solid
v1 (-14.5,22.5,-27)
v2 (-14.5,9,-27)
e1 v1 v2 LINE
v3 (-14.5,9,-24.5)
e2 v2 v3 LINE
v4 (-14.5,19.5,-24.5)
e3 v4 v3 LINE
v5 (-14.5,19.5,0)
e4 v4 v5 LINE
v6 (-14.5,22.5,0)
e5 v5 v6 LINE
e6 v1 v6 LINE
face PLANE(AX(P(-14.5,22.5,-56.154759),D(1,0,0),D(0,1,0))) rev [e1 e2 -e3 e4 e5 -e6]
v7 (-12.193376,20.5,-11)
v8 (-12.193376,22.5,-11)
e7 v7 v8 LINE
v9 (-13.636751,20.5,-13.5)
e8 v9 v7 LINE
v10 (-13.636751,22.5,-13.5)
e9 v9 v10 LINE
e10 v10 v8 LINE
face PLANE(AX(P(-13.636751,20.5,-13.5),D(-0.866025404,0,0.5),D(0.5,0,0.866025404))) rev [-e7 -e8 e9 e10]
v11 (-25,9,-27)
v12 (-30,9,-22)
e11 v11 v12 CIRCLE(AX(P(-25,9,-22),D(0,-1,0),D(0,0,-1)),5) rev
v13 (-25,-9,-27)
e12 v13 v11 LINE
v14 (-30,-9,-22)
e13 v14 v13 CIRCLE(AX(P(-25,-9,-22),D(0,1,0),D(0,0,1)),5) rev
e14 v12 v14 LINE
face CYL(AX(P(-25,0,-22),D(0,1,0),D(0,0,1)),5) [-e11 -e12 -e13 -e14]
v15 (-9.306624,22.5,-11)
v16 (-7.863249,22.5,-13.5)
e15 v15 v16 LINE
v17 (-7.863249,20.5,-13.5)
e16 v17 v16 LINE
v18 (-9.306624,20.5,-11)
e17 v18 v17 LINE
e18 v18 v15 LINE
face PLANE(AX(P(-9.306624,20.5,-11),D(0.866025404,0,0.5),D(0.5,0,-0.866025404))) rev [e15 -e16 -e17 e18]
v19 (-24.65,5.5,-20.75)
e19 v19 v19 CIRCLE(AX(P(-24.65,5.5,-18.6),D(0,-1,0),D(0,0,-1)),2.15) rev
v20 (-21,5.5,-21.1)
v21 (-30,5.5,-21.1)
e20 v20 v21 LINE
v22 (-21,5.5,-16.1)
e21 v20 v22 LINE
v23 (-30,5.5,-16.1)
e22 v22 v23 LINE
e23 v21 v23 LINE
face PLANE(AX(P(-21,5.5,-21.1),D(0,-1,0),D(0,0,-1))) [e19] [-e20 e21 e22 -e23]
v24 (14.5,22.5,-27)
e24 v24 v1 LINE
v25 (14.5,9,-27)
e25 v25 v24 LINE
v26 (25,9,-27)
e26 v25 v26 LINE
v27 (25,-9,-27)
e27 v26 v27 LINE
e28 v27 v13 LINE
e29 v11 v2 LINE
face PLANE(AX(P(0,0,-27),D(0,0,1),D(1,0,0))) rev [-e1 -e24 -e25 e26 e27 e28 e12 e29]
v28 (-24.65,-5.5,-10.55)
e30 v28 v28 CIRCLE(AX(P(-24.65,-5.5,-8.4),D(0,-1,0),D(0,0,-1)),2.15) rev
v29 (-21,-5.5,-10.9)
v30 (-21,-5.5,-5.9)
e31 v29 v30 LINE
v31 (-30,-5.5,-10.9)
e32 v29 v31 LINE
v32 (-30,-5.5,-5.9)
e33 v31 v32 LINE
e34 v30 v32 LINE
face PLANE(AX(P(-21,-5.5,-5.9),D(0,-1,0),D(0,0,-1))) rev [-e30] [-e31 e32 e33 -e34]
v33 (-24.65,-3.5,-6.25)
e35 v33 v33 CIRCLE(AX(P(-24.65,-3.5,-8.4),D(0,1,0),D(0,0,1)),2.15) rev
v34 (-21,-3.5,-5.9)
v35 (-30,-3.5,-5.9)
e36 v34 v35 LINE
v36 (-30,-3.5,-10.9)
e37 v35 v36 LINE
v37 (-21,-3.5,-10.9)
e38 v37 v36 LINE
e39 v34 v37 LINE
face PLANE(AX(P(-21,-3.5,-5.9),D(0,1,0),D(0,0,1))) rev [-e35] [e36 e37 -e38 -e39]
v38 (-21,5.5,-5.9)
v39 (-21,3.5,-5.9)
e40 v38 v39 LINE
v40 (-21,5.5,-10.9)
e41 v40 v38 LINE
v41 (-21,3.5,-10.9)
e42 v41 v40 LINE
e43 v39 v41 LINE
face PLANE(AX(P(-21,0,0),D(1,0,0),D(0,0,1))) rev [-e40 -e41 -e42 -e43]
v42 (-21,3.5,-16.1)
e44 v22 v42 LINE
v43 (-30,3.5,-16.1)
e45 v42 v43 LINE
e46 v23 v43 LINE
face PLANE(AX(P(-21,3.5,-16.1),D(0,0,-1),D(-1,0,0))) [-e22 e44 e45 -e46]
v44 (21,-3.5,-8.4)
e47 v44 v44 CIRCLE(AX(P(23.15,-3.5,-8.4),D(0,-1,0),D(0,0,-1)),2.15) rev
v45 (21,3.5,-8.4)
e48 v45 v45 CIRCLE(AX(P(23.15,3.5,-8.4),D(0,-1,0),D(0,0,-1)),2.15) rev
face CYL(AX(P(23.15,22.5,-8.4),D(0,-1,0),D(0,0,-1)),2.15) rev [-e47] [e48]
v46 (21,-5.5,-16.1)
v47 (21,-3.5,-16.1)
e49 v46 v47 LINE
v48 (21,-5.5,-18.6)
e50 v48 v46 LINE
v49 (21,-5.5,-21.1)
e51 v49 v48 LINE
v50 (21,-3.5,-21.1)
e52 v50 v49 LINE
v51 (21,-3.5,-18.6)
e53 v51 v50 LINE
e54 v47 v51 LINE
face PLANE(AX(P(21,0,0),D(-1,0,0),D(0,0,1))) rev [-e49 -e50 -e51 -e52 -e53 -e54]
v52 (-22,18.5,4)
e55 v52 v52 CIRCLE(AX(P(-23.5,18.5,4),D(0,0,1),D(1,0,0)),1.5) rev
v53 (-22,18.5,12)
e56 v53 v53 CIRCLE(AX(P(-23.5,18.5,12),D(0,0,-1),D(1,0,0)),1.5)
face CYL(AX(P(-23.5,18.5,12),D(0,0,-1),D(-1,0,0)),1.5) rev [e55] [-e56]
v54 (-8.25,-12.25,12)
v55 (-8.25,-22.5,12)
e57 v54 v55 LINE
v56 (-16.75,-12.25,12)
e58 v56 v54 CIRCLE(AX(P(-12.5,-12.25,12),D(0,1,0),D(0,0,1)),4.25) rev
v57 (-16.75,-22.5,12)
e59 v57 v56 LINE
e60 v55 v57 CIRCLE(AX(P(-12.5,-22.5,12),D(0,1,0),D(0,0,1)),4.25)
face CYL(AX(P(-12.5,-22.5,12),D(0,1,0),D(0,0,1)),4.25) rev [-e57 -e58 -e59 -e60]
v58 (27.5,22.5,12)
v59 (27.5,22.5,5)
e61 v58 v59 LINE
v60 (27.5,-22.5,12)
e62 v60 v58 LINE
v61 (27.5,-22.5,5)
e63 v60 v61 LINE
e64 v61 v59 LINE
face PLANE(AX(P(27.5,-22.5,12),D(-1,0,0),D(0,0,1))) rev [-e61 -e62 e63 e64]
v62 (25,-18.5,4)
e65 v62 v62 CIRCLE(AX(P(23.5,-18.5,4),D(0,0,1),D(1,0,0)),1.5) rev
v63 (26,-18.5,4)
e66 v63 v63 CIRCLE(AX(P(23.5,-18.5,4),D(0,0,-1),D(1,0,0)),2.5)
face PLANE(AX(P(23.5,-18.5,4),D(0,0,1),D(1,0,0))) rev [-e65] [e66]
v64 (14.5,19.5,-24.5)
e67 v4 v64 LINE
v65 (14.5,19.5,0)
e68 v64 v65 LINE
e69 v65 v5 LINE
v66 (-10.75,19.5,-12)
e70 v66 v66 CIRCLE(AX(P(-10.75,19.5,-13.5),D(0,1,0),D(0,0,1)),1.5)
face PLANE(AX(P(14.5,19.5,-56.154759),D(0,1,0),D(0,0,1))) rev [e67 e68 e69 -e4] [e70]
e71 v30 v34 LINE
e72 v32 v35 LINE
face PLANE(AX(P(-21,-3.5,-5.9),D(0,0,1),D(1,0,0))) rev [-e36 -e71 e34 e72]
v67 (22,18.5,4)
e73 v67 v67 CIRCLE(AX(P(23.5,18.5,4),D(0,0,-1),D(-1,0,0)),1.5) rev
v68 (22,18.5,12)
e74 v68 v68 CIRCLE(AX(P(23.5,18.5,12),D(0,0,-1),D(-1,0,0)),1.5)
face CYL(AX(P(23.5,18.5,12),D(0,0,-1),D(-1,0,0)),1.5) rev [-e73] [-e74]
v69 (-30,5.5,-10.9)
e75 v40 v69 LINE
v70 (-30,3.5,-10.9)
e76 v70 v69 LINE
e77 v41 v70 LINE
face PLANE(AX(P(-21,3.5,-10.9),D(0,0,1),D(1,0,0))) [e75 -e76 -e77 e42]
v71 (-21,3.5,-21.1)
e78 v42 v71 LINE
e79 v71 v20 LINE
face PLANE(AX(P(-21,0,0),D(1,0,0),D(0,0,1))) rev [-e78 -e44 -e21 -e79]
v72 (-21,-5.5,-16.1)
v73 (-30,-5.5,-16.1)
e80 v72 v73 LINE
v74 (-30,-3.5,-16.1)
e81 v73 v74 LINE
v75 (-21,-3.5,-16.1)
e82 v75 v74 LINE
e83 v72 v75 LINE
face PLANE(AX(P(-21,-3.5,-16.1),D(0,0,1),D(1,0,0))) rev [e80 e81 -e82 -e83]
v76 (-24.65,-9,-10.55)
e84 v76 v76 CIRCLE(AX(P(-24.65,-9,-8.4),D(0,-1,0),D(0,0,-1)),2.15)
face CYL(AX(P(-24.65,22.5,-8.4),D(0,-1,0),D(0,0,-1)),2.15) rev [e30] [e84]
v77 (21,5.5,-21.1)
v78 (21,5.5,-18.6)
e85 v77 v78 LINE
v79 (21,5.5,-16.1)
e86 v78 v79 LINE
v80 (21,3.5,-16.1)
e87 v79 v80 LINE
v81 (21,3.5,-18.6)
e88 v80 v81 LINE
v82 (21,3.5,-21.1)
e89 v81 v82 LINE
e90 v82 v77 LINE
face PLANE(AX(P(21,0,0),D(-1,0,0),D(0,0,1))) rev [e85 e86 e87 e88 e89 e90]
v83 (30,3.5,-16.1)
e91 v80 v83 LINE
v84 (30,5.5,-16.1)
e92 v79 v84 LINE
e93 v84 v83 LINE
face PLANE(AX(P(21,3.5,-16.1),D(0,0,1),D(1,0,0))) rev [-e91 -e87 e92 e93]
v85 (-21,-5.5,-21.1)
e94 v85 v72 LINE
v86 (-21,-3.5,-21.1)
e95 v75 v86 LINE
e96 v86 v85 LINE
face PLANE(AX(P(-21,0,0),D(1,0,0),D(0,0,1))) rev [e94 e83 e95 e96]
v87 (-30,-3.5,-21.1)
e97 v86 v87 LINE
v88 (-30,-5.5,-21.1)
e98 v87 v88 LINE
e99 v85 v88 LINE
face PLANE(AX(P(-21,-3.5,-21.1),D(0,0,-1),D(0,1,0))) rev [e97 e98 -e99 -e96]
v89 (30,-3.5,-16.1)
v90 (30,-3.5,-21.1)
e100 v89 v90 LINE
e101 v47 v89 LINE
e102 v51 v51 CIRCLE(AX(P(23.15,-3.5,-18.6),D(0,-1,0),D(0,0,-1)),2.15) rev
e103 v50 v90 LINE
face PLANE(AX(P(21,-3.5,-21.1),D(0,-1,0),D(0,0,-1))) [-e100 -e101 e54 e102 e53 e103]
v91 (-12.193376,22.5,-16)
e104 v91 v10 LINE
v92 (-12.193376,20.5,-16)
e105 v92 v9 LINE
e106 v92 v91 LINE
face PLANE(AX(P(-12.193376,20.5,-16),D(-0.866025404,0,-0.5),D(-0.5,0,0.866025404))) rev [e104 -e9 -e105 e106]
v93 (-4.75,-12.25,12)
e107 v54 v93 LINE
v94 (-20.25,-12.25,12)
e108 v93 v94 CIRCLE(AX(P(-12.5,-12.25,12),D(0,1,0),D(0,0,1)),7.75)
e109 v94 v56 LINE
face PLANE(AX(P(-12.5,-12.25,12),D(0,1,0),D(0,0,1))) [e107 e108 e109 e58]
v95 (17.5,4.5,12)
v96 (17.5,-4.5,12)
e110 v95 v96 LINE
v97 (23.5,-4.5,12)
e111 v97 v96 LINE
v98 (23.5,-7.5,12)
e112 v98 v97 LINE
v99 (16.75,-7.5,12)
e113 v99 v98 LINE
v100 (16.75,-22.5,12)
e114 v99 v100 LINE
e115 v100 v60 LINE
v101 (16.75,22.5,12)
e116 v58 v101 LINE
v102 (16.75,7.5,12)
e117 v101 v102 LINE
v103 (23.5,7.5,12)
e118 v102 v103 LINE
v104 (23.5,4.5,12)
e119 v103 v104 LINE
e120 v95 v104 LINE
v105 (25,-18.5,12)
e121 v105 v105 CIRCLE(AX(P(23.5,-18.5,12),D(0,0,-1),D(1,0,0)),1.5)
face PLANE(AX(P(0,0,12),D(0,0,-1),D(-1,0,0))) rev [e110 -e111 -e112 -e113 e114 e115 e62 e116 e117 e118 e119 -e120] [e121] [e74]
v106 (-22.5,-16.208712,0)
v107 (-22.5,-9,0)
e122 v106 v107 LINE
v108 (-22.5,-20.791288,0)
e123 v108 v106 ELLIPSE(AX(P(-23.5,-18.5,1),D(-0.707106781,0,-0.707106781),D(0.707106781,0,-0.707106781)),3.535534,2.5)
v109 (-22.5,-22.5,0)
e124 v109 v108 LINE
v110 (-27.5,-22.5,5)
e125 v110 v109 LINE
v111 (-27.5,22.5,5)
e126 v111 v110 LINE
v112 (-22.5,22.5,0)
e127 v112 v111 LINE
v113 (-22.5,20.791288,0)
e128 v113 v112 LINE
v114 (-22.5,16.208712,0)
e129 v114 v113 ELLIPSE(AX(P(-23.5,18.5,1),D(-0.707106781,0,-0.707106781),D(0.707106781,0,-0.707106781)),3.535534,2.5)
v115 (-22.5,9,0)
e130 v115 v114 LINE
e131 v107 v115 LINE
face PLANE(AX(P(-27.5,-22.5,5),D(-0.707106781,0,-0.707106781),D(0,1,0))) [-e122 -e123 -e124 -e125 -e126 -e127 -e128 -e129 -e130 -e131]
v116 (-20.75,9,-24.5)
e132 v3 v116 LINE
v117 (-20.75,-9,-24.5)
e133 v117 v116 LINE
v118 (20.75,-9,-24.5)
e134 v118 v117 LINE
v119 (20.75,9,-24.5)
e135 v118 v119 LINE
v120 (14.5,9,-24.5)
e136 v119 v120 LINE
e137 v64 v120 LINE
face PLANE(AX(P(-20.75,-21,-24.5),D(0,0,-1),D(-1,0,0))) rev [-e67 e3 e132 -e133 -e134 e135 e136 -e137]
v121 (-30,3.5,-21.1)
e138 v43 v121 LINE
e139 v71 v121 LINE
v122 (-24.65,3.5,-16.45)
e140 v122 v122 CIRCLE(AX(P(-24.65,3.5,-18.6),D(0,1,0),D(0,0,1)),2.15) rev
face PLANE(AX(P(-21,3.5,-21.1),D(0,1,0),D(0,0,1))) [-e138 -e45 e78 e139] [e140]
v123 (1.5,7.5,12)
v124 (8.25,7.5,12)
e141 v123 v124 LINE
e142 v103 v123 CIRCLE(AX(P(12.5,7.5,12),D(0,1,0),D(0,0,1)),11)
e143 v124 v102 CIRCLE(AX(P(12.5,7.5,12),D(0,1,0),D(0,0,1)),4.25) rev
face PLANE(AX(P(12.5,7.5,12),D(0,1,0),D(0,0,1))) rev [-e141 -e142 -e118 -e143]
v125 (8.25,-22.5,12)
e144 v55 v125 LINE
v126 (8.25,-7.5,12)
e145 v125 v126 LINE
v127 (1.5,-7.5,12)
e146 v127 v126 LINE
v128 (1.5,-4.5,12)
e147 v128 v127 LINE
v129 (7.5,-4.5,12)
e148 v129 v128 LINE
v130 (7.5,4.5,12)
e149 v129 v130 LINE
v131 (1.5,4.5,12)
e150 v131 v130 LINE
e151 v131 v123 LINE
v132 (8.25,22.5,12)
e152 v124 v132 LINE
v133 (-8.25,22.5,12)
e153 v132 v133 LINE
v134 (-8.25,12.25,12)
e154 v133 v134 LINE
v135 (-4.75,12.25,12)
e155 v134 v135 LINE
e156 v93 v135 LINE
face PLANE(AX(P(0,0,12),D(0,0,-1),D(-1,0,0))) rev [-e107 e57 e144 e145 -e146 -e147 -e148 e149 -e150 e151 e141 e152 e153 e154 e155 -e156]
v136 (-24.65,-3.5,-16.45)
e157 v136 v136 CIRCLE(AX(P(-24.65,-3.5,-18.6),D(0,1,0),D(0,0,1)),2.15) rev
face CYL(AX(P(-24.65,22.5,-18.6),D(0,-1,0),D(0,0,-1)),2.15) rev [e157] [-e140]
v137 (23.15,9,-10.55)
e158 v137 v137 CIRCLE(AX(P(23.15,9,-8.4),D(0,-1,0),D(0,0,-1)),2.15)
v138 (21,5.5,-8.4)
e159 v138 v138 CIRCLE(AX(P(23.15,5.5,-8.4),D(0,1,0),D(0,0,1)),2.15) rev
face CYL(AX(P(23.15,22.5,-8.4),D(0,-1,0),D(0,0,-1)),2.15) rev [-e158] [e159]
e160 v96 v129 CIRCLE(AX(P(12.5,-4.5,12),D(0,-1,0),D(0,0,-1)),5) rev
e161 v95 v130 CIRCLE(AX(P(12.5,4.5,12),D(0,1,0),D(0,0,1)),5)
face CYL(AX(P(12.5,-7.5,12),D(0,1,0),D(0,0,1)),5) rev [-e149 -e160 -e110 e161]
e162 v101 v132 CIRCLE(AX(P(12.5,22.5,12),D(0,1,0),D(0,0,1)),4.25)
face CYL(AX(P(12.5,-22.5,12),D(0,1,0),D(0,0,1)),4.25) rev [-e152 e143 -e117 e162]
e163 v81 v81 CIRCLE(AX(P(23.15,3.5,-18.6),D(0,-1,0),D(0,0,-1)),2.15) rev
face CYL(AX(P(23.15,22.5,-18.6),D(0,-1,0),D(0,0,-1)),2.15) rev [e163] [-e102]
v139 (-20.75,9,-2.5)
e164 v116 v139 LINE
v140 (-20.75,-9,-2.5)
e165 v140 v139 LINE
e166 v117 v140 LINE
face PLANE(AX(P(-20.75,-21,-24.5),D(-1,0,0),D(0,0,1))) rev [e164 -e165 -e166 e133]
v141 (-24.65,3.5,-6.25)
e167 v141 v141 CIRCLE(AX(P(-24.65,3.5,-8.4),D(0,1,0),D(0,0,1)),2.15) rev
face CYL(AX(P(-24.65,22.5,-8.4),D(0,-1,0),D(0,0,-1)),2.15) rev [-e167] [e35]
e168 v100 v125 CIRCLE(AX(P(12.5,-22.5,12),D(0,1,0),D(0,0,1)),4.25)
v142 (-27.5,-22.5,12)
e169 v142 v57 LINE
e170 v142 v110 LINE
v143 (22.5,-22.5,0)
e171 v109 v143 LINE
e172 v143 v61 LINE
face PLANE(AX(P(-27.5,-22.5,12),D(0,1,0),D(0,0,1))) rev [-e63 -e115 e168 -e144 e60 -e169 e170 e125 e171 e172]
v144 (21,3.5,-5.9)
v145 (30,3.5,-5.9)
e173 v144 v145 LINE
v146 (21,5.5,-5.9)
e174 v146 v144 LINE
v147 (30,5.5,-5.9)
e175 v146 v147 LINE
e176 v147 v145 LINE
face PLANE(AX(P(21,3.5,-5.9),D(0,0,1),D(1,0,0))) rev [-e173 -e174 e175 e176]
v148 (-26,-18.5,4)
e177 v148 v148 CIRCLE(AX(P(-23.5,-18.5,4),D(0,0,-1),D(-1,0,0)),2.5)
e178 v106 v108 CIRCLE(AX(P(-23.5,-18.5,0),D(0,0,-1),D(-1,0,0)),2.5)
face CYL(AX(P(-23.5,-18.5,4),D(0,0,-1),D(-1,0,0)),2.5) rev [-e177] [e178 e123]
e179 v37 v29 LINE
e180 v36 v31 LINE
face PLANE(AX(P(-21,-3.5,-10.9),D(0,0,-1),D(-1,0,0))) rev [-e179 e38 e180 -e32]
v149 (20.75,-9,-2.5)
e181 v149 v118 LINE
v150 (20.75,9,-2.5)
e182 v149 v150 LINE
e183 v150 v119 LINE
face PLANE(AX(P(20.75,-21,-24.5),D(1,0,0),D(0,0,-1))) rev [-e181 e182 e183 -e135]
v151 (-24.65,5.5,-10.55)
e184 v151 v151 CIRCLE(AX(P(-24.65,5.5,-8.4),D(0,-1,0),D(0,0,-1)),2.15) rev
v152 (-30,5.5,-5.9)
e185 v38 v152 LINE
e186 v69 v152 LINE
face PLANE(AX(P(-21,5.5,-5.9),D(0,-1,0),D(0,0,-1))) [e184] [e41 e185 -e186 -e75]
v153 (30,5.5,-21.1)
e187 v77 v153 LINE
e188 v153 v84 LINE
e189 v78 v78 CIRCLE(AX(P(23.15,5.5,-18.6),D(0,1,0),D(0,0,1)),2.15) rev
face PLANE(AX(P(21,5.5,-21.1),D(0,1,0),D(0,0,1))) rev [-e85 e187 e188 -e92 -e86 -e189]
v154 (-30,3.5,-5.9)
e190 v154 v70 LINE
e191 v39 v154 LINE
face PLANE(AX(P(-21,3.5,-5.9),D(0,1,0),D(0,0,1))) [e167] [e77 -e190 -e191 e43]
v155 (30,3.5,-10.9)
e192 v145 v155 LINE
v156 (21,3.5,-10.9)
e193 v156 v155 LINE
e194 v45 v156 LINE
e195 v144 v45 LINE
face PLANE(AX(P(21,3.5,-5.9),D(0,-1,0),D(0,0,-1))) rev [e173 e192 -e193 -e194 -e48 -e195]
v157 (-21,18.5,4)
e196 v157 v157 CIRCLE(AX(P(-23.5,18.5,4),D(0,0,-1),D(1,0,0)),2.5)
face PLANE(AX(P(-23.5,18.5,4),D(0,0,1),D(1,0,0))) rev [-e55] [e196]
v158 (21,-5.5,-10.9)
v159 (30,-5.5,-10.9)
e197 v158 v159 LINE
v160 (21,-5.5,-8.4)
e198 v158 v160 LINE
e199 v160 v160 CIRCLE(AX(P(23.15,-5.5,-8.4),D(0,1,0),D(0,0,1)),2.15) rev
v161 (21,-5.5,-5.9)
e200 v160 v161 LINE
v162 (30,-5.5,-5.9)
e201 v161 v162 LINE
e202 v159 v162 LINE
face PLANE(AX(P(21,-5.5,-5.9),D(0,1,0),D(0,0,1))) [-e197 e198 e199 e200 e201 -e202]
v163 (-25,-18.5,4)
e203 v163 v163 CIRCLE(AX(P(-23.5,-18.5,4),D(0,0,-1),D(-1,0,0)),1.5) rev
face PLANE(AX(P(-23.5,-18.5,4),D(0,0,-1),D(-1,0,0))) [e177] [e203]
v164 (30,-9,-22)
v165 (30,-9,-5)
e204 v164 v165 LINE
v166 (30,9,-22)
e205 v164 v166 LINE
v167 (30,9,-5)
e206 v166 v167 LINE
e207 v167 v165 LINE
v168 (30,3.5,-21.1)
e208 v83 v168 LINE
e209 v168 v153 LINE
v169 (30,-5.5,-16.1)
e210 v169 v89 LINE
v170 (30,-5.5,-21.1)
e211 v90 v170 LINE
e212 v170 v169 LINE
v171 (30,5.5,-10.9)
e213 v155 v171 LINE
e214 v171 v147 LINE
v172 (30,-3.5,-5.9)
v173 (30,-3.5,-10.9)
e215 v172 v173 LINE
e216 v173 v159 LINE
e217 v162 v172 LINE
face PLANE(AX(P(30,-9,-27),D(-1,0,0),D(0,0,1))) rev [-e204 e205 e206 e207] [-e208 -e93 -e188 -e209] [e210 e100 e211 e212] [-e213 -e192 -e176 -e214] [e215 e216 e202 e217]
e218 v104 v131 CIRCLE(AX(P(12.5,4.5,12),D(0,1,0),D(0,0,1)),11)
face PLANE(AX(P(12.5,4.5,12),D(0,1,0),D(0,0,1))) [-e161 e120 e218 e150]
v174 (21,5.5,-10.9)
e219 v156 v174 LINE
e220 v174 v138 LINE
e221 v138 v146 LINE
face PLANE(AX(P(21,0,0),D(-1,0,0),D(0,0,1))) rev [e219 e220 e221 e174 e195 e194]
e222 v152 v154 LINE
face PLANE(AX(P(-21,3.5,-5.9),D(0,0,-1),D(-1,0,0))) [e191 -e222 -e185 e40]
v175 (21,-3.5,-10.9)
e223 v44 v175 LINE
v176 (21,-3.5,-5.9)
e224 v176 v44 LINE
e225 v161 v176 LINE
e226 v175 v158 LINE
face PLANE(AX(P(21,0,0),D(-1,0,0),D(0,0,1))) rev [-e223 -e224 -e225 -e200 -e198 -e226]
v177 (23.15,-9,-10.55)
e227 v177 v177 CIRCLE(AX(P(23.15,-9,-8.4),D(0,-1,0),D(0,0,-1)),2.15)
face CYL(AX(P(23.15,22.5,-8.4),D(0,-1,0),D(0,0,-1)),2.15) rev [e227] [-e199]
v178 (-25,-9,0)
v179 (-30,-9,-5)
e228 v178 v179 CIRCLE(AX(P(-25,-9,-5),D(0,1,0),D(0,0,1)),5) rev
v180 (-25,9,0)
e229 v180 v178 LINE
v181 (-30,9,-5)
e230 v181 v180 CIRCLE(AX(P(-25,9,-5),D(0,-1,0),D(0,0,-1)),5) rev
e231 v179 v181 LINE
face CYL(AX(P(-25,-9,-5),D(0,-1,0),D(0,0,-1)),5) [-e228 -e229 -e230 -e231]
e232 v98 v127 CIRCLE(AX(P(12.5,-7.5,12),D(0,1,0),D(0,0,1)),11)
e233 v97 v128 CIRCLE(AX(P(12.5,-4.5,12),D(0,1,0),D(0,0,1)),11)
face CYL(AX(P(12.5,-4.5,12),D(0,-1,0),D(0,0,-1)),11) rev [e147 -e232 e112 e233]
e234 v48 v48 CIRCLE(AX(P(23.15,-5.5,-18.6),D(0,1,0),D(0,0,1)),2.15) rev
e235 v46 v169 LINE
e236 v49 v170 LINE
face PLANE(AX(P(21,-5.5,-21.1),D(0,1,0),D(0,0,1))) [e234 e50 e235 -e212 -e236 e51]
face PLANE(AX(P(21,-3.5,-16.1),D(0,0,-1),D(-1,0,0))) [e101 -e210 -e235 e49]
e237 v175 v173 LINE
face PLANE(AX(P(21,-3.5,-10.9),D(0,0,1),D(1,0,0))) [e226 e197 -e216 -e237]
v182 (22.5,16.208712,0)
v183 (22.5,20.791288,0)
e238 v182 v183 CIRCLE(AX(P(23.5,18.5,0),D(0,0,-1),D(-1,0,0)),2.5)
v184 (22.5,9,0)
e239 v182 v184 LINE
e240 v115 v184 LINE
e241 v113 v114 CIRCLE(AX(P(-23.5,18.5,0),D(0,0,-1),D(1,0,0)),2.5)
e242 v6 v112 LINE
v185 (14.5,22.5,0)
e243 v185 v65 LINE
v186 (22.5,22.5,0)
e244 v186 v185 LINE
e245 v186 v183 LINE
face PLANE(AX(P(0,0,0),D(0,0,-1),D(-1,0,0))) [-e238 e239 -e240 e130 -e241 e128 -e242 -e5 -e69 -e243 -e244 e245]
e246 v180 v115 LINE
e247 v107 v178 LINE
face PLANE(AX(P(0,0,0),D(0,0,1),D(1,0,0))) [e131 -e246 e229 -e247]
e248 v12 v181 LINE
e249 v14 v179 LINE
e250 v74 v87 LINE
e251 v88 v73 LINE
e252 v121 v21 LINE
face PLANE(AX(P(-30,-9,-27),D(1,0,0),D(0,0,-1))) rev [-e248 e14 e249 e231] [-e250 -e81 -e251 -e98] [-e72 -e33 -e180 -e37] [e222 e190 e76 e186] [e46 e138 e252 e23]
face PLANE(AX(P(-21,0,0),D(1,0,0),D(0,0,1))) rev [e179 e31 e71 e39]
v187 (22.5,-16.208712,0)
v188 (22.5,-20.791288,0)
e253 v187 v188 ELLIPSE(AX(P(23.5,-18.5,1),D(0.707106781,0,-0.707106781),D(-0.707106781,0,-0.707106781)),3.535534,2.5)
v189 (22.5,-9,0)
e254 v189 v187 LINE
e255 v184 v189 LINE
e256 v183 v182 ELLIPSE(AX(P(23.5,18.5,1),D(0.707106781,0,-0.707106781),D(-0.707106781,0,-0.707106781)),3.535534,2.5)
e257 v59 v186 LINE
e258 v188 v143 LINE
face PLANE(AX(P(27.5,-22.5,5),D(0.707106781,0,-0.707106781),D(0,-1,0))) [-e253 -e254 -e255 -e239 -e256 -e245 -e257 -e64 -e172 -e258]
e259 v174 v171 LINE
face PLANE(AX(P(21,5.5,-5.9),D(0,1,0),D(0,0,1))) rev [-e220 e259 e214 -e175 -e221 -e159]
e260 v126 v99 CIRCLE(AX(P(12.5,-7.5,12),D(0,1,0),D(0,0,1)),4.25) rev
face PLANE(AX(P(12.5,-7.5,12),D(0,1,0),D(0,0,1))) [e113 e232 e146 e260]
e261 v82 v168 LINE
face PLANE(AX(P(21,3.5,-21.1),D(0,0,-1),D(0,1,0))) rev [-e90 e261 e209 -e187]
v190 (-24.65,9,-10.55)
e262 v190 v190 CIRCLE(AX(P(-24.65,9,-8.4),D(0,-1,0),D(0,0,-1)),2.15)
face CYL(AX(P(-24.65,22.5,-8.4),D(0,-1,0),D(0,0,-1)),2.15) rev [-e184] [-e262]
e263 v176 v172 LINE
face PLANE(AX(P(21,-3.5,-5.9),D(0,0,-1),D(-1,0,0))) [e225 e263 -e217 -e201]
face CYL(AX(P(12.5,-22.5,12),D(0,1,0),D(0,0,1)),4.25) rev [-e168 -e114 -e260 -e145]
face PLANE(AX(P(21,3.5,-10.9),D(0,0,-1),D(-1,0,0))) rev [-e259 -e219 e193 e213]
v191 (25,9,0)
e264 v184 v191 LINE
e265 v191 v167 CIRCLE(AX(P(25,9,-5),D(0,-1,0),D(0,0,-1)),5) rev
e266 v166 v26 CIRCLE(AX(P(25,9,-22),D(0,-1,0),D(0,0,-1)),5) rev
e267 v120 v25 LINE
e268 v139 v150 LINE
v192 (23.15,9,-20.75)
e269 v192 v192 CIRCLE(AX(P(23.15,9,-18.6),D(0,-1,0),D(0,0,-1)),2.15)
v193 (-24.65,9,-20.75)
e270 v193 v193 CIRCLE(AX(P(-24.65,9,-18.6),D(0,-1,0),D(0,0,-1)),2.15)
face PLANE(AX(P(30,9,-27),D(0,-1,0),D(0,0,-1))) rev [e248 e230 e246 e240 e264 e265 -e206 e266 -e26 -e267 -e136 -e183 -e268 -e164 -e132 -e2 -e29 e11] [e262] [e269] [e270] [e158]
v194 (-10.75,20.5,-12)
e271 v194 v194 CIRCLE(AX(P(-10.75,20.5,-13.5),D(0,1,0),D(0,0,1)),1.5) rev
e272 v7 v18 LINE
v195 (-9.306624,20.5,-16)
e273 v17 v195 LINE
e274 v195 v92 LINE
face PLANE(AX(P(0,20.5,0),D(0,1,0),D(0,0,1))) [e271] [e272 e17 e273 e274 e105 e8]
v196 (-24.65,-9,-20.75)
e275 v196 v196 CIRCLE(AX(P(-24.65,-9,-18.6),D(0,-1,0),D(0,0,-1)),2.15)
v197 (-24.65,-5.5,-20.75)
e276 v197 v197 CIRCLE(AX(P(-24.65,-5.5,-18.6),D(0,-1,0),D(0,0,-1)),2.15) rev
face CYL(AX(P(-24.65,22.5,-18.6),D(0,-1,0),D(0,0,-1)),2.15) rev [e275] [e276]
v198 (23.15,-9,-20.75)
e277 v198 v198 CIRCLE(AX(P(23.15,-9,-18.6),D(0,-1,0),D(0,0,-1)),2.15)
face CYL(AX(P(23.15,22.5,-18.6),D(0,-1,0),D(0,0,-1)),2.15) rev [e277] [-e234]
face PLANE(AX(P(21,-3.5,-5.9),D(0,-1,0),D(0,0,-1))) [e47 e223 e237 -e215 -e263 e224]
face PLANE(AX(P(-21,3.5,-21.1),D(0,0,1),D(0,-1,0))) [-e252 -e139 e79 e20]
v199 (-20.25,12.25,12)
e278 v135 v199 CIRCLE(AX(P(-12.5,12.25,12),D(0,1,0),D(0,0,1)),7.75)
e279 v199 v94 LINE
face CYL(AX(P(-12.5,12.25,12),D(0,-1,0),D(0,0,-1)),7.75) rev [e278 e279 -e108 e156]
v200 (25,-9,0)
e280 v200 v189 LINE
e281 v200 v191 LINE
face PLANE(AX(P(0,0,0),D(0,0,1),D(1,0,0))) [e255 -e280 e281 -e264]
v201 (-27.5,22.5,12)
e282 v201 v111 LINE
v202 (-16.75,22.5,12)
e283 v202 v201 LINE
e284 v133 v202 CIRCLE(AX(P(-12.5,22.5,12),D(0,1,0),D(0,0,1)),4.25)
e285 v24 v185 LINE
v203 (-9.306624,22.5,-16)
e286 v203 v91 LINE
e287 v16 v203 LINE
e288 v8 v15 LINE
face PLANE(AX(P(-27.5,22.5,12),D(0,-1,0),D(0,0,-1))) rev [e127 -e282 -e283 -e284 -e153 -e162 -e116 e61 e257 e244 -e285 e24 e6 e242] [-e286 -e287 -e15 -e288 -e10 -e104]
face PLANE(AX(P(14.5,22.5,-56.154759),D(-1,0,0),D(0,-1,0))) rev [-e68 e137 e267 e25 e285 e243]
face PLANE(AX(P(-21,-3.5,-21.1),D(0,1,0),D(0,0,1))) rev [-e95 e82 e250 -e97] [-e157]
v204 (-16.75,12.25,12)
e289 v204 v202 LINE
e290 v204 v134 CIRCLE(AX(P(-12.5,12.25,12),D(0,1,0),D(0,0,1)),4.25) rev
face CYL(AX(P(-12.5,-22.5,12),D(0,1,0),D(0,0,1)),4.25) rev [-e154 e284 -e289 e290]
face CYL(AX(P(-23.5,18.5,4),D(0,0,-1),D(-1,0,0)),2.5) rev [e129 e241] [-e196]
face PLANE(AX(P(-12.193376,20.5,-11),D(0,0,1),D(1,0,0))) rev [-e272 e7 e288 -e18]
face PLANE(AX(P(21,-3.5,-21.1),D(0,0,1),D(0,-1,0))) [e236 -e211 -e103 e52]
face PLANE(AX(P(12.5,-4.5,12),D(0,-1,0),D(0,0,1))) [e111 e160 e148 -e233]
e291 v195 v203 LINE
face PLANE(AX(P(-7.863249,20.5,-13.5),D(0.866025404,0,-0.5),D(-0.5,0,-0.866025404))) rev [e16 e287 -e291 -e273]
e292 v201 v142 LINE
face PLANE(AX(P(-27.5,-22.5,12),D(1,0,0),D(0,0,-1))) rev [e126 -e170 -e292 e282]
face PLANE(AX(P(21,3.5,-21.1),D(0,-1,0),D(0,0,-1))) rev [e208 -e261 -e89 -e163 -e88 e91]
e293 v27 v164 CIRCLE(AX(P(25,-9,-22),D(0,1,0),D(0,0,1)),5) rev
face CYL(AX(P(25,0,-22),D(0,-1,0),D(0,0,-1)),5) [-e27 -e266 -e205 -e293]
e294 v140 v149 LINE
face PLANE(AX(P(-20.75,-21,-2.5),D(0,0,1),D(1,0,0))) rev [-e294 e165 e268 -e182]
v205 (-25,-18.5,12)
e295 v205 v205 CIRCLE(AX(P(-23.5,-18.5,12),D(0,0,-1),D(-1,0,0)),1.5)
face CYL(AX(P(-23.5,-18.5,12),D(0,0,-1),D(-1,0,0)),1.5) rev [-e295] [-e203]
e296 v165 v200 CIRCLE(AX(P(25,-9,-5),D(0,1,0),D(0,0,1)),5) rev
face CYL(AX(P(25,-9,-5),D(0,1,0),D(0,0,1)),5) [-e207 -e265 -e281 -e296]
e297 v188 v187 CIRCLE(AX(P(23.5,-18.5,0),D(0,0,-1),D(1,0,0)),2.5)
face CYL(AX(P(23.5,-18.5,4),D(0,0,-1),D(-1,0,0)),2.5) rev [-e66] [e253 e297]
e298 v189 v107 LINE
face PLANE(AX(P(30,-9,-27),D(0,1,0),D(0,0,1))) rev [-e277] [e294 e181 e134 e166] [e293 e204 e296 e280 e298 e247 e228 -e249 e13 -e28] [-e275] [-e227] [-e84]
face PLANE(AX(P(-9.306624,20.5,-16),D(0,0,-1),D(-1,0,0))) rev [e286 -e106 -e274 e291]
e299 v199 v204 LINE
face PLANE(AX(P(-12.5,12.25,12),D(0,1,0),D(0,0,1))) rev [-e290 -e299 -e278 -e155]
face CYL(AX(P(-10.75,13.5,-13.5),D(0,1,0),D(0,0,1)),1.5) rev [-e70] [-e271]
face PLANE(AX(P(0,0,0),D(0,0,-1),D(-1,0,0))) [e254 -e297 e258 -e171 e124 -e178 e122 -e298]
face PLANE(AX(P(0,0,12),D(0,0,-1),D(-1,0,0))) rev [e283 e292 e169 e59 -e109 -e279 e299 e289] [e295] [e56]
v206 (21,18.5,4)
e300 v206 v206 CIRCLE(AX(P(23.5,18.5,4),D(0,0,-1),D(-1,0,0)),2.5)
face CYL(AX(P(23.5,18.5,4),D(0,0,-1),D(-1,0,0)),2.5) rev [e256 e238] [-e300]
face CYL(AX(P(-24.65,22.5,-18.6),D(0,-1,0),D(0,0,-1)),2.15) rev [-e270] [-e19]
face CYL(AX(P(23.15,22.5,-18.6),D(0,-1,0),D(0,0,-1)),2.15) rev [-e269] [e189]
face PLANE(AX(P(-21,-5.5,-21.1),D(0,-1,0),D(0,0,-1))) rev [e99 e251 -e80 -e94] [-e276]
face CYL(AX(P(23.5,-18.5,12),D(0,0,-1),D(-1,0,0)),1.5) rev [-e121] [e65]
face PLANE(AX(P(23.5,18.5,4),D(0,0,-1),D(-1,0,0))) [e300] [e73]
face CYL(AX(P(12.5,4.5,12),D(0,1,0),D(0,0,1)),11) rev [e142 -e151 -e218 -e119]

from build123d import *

# Parameters (mm, degrees)
ESQUISSE1_W                  = 55
ESQUISSE1_H                  = 45
BOSS_EXTRU_1_DEPTH           = 12
ESQUISSE2_R                  = 4.25
ENL_V_MAT_EXTRU_1_DEPTH      = 55.085580333
ENL_V_MAT_EXTRU_2_DEPTH      = 12.25
ENL_V_MAT_EXTRU_2_DEPTH_BACK = 12.25
ESQUISSE3_R                  = 7.75
ESQUISSE4_R                  = 11
ENL_V_MAT_EXTRU_3_DEPTH      = 3
ESQUISSE5_R                  = 5
ENL_V_MAT_EXTRU_4_DEPTH      = 15
ENL_V_MAT_EXTRU_5_DEPTH      = 38.503333185
ENL_V_MAT_EXTRU_5_DEPTH_BACK = 38.503333185
ESQUISSE6_R                  = 1.5
ESQUISSE7_R                  = 2.5
ENL_V_MAT_EXTRU_6_DEPTH      = 4
CHANFREIN3_SIZE              = 5
ESQUISSE9_W                  = 60
ESQUISSE9_H                  = 18
BOSS_EXTRU_2_DEPTH           = 27
ESQUISSE10_W                 = 41.5
ESQUISSE10_H                 = 22
ENL_V_MAT_EXTRU_7_DEPTH      = 30
ESQUISSE11_R                 = 2.15
ENL_V_MAT_EXTRU_8_DEPTH      = 52.198144498
CONG_2_R                     = 5
CONG_3_R                     = 5
ESQUISSE12_W                 = 5
ESQUISSE12_H                 = 2
ENL_V_MAT_EXTRU_9_DEPTH      = 9
SYM_TRIE4_COPY_1_SKETCH_W    = 5
SYM_TRIE4_COPY_1_SKETCH_H    = 2
SYM_TRIE4_COPY_1_DEPTH       = 9
ESQUISSE13_W                 = 29
ESQUISSE13_H                 = 3
BOSS_EXTRU_3_DEPTH           = 27
BOSS_EXTRU_4_REACH           = 53.198
ESQUISSE14_W                 = 29
ESQUISSE14_H                 = 2.5
ESQUISSE15_R                 = 1.5
ENL_V_MAT_EXTRU_10_DEPTH     = 9
ENL_V_MAT_EXTRU_11_DEPTH     = 2


with BuildPart() as part:
    # Esquisse1 → Boss.-Extru.1 (new body)
    with BuildSketch(Plane.XY):
        Rectangle(ESQUISSE1_W, ESQUISSE1_H)
    extrude(amount=BOSS_EXTRU_1_DEPTH)

    # Esquisse2 → Enlèv. mat.-Extru.1 (cut, through all)
    with BuildSketch(Plane(origin=(0, 22.5, 0), x_dir=(1, 0, 0), z_dir=(0, 1, 0))):
        with Locations((-12.5, -12)):
            Circle(ESQUISSE2_R)
        with Locations((12.5, -12)):
            Circle(ESQUISSE2_R)
    extrude(amount=-ENL_V_MAT_EXTRU_1_DEPTH, mode=Mode.SUBTRACT)

    # Esquisse3 → Enlèv. mat.-Extru.2 (cut, two sides: drawn at the far end of the back side and taken through both)
    with BuildSketch(Plane(origin=(0, 0, 0), x_dir=(1, 0, 0), z_dir=(0, 1, 0)).offset(-ENL_V_MAT_EXTRU_2_DEPTH_BACK)):
        with Locations((-12.5, -12)):
            Circle(ESQUISSE3_R)
    extrude(amount=ENL_V_MAT_EXTRU_2_DEPTH + ENL_V_MAT_EXTRU_2_DEPTH_BACK, mode=Mode.SUBTRACT)

    # Esquisse4 → Enlèv. mat.-Extru.3 (cut)
    with BuildSketch(Plane(origin=(0, 7.5, 0), x_dir=(1, 0, 0), z_dir=(0, 1, 0))):
        with Locations((12.5, -12)):
            Circle(ESQUISSE4_R)
    enl_v_mat_extru_3 = extrude(amount=-ENL_V_MAT_EXTRU_3_DEPTH, mode=Mode.SUBTRACT)

    # Esquisse5 → Enlèv. mat.-Extru.4 (cut)
    with BuildSketch(Plane(origin=(0, 7.5, 0), x_dir=(1, 0, 0), z_dir=(0, 1, 0))):
        with Locations((12.5, -12)):
            Circle(ESQUISSE5_R)
    extrude(amount=-ENL_V_MAT_EXTRU_4_DEPTH, mode=Mode.SUBTRACT)

    # Esquisse6 → Enlèv. mat.-Extru.5 (cut, two sides: drawn at the far end of the back side and taken through both)
    with BuildSketch(Plane(origin=(0, 0, 0), x_dir=(-1, 0, 0), z_dir=(0, 0, -1)).offset(-ENL_V_MAT_EXTRU_5_DEPTH_BACK)):
        with Locations((23.5, -18.5)):
            Circle(ESQUISSE6_R)
        with Locations((-23.5, -18.5)):
            Circle(ESQUISSE6_R)
        with Locations((-23.5, 18.5)):
            Circle(ESQUISSE6_R)
        with Locations((23.5, 18.5)):
            Circle(ESQUISSE6_R)
    extrude(amount=ENL_V_MAT_EXTRU_5_DEPTH + ENL_V_MAT_EXTRU_5_DEPTH_BACK, mode=Mode.SUBTRACT)

    # Esquisse7 → Enlèv. mat.-Extru.6 (cut)
    with BuildSketch(Plane(origin=(0, 0, 0), x_dir=(-1, 0, 0), z_dir=(0, 0, -1))):
        with Locations((23.5, -18.5)):
            Circle(ESQUISSE7_R)
        with Locations(Location((23.5, 18.5, 0), (0, 0, 180))):
            Circle(ESQUISSE7_R)
        with Locations((-23.5, 18.5)):
            Circle(ESQUISSE7_R)
        with Locations(Location((-23.5, -18.5, 0), (0, 0, 180))):
            Circle(ESQUISSE7_R)
    extrude(amount=-ENL_V_MAT_EXTRU_6_DEPTH, mode=Mode.SUBTRACT)

    # Chanfrein3
    # the kernel refuses this chamfer: 5 mm, written as the material it takes off along each edge
    with BuildSketch(Plane(origin=(-27.5, 35.35841494, 0), x_dir=(0.9996219169112968, 0, -0.027495876610586372), z_dir=(0, -1, 0)), Plane(origin=(27.5, -35.35841494, 0), x_dir=(-0.9996219169112968, 0, -0.027495876610586372), z_dir=(0, 1, 0))) as chanfrein3_piece_1:
        Polygon((CHANFREIN3_SIZE * 0.999621916911, CHANFREIN3_SIZE * 0.0274958766106), (-CHANFREIN3_SIZE * 0.0274958766106, CHANFREIN3_SIZE * 0.999621916911), (0, 0), align=None)
    extrude(amount=70.71682988, mode=Mode.SUBTRACT)

    # Symétrie2: Enlèv. mat.-Extru.3 across plane
    add(enl_v_mat_extru_3.mirror(Plane.ZX), mode=Mode.SUBTRACT)

    # Esquisse9 → Boss.-Extru.2 (add)
    with BuildSketch(Plane(origin=(0, 0, 0), x_dir=(-1, 0, 0), z_dir=(0, 0, -1))):
        Rectangle(ESQUISSE9_W, ESQUISSE9_H)
    extrude(amount=BOSS_EXTRU_2_DEPTH)

    # Esquisse10 → Enlèv. mat.-Extru.7 (cut)
    with BuildSketch(Plane(origin=(0, 9, 0), x_dir=(1, 0, 0), z_dir=(0, 1, 0))):
        with Locations((0, 13.5)):
            Rectangle(ESQUISSE10_W, ESQUISSE10_H)
    extrude(amount=-ENL_V_MAT_EXTRU_7_DEPTH, mode=Mode.SUBTRACT)

    # Esquisse11 → Enlèv. mat.-Extru.8 (cut, through all)
    with BuildSketch(Plane(origin=(0, -9, 0), x_dir=(-1, 0, 0), z_dir=(0, -1, 0))):
        with Locations(Location((-23.15, 8.4, 0), (0, 0, 90))):
            Circle(ESQUISSE11_R)
        with Locations(Location((-23.15, 18.6, 0), (0, 0, 90))):
            Circle(ESQUISSE11_R)
        with Locations(Location((24.65, 8.4, 0), (0, 0, 90))):
            Circle(ESQUISSE11_R)
        with Locations(Location((24.65, 18.6, 0), (0, 0, 90))):
            Circle(ESQUISSE11_R)
    extrude(amount=-ENL_V_MAT_EXTRU_8_DEPTH, mode=Mode.SUBTRACT)

    # Congé2
    cong_2_edges = [part.edges().sort_by_distance(p)[0] for p in [
        (-30, 0, 0),
        (30, 0, 0),
    ]]
    fillet(cong_2_edges, radius=CONG_2_R)

    # Congé3
    cong_3_edges = [part.edges().sort_by_distance(p)[0] for p in [
        (-30, 0, -27),
        (30, 0, -27),
    ]]
    fillet(cong_3_edges, radius=CONG_3_R)

    # Esquisse12 → Enlèv. mat.-Extru.9 (cut)
    with BuildSketch(Plane(origin=(30, 0, 0), x_dir=(0, 0, -1), z_dir=(1, 0, 0))):
        with Locations((8.4, 4.5)):
            Rectangle(ESQUISSE12_W, ESQUISSE12_H)
        with Locations((18.6, 4.5)):
            Rectangle(ESQUISSE12_W, ESQUISSE12_H)
    enl_v_mat_extru_9 = extrude(amount=-ENL_V_MAT_EXTRU_9_DEPTH, mode=Mode.SUBTRACT)

    # Symétrie3: Enlèv. mat.-Extru.9 across plane
    add(enl_v_mat_extru_9.mirror(Plane(origin=(0, 0, 0), x_dir=(0, 0, 1), z_dir=(1, 0, 0))), mode=Mode.SUBTRACT)

    # Symétrie4: Enlèv. mat.-Extru.9 across plane
    add(enl_v_mat_extru_9.mirror(Plane.ZX), mode=Mode.SUBTRACT)

    # Symétrie4 copy 1 sketch → Symétrie4 copy 1 (cut)
    with BuildSketch(Plane(origin=(-30, 0, 0), x_dir=(0, 0, -1), z_dir=(-1, 0, 0))):
        with Locations((8.4, 4.5)):
            Rectangle(SYM_TRIE4_COPY_1_SKETCH_W, SYM_TRIE4_COPY_1_SKETCH_H)
        with Locations((18.6, 4.5)):
            Rectangle(SYM_TRIE4_COPY_1_SKETCH_W, SYM_TRIE4_COPY_1_SKETCH_H)
    extrude(amount=-SYM_TRIE4_COPY_1_DEPTH, mode=Mode.SUBTRACT)

    # Esquisse13 → Boss.-Extru.3 (add)
    with BuildSketch(Plane(origin=(0, 0, 0), x_dir=(-1, 0, 0), z_dir=(0, 0, -1))):
        with Locations((0, 21)):
            Rectangle(ESQUISSE13_W, ESQUISSE13_H)
    extrude(amount=BOSS_EXTRU_3_DEPTH)

    # Esquisse14 → Boss.-Extru.4 (add, up to next)
    with BuildSketch(Plane(origin=(0, 9, 0), x_dir=(1, 0, 0), z_dir=(0, 1, 0)), mode=Mode.PRIVATE) as boss_extru_4_sk1:
        with Locations((0, 25.75)):
            Rectangle(ESQUISSE14_W, ESQUISSE14_H)
    boss_extru_4_tool1 = extrude(boss_extru_4_sk1.sketch, amount=BOSS_EXTRU_4_REACH, mode=Mode.PRIVATE) - part.part
    add(boss_extru_4_tool1.solids().sort_by_distance((0, 9, -25.75))[0])

    # Esquisse15 → Enlèv. mat.-Extru.10 (cut)
    with BuildSketch(Plane(origin=(0, 22.5, 0), x_dir=(1, 0, 0), z_dir=(0, 1, 0))):
        with Locations(Location((-10.75, 13.5, 0), (0, 0, 270))):
            Circle(ESQUISSE15_R)
    extrude(amount=-ENL_V_MAT_EXTRU_10_DEPTH, mode=Mode.SUBTRACT)

    # Esquisse16 → Enlèv. mat.-Extru.11 (cut)
    with BuildSketch(Plane(origin=(0, 22.5, 0), x_dir=(1, 0, 0), z_dir=(0, 1, 0))):
        Polygon((-9.306624327, 16), (-12.193375673, 16), (-13.636751346, 13.5), (-12.193375673, 11), (-9.306624327, 11), (-7.863248654, 13.5), align=None)
    extrude(amount=-ENL_V_MAT_EXTRU_11_DEPTH, mode=Mode.SUBTRACT)


solid = part.part
